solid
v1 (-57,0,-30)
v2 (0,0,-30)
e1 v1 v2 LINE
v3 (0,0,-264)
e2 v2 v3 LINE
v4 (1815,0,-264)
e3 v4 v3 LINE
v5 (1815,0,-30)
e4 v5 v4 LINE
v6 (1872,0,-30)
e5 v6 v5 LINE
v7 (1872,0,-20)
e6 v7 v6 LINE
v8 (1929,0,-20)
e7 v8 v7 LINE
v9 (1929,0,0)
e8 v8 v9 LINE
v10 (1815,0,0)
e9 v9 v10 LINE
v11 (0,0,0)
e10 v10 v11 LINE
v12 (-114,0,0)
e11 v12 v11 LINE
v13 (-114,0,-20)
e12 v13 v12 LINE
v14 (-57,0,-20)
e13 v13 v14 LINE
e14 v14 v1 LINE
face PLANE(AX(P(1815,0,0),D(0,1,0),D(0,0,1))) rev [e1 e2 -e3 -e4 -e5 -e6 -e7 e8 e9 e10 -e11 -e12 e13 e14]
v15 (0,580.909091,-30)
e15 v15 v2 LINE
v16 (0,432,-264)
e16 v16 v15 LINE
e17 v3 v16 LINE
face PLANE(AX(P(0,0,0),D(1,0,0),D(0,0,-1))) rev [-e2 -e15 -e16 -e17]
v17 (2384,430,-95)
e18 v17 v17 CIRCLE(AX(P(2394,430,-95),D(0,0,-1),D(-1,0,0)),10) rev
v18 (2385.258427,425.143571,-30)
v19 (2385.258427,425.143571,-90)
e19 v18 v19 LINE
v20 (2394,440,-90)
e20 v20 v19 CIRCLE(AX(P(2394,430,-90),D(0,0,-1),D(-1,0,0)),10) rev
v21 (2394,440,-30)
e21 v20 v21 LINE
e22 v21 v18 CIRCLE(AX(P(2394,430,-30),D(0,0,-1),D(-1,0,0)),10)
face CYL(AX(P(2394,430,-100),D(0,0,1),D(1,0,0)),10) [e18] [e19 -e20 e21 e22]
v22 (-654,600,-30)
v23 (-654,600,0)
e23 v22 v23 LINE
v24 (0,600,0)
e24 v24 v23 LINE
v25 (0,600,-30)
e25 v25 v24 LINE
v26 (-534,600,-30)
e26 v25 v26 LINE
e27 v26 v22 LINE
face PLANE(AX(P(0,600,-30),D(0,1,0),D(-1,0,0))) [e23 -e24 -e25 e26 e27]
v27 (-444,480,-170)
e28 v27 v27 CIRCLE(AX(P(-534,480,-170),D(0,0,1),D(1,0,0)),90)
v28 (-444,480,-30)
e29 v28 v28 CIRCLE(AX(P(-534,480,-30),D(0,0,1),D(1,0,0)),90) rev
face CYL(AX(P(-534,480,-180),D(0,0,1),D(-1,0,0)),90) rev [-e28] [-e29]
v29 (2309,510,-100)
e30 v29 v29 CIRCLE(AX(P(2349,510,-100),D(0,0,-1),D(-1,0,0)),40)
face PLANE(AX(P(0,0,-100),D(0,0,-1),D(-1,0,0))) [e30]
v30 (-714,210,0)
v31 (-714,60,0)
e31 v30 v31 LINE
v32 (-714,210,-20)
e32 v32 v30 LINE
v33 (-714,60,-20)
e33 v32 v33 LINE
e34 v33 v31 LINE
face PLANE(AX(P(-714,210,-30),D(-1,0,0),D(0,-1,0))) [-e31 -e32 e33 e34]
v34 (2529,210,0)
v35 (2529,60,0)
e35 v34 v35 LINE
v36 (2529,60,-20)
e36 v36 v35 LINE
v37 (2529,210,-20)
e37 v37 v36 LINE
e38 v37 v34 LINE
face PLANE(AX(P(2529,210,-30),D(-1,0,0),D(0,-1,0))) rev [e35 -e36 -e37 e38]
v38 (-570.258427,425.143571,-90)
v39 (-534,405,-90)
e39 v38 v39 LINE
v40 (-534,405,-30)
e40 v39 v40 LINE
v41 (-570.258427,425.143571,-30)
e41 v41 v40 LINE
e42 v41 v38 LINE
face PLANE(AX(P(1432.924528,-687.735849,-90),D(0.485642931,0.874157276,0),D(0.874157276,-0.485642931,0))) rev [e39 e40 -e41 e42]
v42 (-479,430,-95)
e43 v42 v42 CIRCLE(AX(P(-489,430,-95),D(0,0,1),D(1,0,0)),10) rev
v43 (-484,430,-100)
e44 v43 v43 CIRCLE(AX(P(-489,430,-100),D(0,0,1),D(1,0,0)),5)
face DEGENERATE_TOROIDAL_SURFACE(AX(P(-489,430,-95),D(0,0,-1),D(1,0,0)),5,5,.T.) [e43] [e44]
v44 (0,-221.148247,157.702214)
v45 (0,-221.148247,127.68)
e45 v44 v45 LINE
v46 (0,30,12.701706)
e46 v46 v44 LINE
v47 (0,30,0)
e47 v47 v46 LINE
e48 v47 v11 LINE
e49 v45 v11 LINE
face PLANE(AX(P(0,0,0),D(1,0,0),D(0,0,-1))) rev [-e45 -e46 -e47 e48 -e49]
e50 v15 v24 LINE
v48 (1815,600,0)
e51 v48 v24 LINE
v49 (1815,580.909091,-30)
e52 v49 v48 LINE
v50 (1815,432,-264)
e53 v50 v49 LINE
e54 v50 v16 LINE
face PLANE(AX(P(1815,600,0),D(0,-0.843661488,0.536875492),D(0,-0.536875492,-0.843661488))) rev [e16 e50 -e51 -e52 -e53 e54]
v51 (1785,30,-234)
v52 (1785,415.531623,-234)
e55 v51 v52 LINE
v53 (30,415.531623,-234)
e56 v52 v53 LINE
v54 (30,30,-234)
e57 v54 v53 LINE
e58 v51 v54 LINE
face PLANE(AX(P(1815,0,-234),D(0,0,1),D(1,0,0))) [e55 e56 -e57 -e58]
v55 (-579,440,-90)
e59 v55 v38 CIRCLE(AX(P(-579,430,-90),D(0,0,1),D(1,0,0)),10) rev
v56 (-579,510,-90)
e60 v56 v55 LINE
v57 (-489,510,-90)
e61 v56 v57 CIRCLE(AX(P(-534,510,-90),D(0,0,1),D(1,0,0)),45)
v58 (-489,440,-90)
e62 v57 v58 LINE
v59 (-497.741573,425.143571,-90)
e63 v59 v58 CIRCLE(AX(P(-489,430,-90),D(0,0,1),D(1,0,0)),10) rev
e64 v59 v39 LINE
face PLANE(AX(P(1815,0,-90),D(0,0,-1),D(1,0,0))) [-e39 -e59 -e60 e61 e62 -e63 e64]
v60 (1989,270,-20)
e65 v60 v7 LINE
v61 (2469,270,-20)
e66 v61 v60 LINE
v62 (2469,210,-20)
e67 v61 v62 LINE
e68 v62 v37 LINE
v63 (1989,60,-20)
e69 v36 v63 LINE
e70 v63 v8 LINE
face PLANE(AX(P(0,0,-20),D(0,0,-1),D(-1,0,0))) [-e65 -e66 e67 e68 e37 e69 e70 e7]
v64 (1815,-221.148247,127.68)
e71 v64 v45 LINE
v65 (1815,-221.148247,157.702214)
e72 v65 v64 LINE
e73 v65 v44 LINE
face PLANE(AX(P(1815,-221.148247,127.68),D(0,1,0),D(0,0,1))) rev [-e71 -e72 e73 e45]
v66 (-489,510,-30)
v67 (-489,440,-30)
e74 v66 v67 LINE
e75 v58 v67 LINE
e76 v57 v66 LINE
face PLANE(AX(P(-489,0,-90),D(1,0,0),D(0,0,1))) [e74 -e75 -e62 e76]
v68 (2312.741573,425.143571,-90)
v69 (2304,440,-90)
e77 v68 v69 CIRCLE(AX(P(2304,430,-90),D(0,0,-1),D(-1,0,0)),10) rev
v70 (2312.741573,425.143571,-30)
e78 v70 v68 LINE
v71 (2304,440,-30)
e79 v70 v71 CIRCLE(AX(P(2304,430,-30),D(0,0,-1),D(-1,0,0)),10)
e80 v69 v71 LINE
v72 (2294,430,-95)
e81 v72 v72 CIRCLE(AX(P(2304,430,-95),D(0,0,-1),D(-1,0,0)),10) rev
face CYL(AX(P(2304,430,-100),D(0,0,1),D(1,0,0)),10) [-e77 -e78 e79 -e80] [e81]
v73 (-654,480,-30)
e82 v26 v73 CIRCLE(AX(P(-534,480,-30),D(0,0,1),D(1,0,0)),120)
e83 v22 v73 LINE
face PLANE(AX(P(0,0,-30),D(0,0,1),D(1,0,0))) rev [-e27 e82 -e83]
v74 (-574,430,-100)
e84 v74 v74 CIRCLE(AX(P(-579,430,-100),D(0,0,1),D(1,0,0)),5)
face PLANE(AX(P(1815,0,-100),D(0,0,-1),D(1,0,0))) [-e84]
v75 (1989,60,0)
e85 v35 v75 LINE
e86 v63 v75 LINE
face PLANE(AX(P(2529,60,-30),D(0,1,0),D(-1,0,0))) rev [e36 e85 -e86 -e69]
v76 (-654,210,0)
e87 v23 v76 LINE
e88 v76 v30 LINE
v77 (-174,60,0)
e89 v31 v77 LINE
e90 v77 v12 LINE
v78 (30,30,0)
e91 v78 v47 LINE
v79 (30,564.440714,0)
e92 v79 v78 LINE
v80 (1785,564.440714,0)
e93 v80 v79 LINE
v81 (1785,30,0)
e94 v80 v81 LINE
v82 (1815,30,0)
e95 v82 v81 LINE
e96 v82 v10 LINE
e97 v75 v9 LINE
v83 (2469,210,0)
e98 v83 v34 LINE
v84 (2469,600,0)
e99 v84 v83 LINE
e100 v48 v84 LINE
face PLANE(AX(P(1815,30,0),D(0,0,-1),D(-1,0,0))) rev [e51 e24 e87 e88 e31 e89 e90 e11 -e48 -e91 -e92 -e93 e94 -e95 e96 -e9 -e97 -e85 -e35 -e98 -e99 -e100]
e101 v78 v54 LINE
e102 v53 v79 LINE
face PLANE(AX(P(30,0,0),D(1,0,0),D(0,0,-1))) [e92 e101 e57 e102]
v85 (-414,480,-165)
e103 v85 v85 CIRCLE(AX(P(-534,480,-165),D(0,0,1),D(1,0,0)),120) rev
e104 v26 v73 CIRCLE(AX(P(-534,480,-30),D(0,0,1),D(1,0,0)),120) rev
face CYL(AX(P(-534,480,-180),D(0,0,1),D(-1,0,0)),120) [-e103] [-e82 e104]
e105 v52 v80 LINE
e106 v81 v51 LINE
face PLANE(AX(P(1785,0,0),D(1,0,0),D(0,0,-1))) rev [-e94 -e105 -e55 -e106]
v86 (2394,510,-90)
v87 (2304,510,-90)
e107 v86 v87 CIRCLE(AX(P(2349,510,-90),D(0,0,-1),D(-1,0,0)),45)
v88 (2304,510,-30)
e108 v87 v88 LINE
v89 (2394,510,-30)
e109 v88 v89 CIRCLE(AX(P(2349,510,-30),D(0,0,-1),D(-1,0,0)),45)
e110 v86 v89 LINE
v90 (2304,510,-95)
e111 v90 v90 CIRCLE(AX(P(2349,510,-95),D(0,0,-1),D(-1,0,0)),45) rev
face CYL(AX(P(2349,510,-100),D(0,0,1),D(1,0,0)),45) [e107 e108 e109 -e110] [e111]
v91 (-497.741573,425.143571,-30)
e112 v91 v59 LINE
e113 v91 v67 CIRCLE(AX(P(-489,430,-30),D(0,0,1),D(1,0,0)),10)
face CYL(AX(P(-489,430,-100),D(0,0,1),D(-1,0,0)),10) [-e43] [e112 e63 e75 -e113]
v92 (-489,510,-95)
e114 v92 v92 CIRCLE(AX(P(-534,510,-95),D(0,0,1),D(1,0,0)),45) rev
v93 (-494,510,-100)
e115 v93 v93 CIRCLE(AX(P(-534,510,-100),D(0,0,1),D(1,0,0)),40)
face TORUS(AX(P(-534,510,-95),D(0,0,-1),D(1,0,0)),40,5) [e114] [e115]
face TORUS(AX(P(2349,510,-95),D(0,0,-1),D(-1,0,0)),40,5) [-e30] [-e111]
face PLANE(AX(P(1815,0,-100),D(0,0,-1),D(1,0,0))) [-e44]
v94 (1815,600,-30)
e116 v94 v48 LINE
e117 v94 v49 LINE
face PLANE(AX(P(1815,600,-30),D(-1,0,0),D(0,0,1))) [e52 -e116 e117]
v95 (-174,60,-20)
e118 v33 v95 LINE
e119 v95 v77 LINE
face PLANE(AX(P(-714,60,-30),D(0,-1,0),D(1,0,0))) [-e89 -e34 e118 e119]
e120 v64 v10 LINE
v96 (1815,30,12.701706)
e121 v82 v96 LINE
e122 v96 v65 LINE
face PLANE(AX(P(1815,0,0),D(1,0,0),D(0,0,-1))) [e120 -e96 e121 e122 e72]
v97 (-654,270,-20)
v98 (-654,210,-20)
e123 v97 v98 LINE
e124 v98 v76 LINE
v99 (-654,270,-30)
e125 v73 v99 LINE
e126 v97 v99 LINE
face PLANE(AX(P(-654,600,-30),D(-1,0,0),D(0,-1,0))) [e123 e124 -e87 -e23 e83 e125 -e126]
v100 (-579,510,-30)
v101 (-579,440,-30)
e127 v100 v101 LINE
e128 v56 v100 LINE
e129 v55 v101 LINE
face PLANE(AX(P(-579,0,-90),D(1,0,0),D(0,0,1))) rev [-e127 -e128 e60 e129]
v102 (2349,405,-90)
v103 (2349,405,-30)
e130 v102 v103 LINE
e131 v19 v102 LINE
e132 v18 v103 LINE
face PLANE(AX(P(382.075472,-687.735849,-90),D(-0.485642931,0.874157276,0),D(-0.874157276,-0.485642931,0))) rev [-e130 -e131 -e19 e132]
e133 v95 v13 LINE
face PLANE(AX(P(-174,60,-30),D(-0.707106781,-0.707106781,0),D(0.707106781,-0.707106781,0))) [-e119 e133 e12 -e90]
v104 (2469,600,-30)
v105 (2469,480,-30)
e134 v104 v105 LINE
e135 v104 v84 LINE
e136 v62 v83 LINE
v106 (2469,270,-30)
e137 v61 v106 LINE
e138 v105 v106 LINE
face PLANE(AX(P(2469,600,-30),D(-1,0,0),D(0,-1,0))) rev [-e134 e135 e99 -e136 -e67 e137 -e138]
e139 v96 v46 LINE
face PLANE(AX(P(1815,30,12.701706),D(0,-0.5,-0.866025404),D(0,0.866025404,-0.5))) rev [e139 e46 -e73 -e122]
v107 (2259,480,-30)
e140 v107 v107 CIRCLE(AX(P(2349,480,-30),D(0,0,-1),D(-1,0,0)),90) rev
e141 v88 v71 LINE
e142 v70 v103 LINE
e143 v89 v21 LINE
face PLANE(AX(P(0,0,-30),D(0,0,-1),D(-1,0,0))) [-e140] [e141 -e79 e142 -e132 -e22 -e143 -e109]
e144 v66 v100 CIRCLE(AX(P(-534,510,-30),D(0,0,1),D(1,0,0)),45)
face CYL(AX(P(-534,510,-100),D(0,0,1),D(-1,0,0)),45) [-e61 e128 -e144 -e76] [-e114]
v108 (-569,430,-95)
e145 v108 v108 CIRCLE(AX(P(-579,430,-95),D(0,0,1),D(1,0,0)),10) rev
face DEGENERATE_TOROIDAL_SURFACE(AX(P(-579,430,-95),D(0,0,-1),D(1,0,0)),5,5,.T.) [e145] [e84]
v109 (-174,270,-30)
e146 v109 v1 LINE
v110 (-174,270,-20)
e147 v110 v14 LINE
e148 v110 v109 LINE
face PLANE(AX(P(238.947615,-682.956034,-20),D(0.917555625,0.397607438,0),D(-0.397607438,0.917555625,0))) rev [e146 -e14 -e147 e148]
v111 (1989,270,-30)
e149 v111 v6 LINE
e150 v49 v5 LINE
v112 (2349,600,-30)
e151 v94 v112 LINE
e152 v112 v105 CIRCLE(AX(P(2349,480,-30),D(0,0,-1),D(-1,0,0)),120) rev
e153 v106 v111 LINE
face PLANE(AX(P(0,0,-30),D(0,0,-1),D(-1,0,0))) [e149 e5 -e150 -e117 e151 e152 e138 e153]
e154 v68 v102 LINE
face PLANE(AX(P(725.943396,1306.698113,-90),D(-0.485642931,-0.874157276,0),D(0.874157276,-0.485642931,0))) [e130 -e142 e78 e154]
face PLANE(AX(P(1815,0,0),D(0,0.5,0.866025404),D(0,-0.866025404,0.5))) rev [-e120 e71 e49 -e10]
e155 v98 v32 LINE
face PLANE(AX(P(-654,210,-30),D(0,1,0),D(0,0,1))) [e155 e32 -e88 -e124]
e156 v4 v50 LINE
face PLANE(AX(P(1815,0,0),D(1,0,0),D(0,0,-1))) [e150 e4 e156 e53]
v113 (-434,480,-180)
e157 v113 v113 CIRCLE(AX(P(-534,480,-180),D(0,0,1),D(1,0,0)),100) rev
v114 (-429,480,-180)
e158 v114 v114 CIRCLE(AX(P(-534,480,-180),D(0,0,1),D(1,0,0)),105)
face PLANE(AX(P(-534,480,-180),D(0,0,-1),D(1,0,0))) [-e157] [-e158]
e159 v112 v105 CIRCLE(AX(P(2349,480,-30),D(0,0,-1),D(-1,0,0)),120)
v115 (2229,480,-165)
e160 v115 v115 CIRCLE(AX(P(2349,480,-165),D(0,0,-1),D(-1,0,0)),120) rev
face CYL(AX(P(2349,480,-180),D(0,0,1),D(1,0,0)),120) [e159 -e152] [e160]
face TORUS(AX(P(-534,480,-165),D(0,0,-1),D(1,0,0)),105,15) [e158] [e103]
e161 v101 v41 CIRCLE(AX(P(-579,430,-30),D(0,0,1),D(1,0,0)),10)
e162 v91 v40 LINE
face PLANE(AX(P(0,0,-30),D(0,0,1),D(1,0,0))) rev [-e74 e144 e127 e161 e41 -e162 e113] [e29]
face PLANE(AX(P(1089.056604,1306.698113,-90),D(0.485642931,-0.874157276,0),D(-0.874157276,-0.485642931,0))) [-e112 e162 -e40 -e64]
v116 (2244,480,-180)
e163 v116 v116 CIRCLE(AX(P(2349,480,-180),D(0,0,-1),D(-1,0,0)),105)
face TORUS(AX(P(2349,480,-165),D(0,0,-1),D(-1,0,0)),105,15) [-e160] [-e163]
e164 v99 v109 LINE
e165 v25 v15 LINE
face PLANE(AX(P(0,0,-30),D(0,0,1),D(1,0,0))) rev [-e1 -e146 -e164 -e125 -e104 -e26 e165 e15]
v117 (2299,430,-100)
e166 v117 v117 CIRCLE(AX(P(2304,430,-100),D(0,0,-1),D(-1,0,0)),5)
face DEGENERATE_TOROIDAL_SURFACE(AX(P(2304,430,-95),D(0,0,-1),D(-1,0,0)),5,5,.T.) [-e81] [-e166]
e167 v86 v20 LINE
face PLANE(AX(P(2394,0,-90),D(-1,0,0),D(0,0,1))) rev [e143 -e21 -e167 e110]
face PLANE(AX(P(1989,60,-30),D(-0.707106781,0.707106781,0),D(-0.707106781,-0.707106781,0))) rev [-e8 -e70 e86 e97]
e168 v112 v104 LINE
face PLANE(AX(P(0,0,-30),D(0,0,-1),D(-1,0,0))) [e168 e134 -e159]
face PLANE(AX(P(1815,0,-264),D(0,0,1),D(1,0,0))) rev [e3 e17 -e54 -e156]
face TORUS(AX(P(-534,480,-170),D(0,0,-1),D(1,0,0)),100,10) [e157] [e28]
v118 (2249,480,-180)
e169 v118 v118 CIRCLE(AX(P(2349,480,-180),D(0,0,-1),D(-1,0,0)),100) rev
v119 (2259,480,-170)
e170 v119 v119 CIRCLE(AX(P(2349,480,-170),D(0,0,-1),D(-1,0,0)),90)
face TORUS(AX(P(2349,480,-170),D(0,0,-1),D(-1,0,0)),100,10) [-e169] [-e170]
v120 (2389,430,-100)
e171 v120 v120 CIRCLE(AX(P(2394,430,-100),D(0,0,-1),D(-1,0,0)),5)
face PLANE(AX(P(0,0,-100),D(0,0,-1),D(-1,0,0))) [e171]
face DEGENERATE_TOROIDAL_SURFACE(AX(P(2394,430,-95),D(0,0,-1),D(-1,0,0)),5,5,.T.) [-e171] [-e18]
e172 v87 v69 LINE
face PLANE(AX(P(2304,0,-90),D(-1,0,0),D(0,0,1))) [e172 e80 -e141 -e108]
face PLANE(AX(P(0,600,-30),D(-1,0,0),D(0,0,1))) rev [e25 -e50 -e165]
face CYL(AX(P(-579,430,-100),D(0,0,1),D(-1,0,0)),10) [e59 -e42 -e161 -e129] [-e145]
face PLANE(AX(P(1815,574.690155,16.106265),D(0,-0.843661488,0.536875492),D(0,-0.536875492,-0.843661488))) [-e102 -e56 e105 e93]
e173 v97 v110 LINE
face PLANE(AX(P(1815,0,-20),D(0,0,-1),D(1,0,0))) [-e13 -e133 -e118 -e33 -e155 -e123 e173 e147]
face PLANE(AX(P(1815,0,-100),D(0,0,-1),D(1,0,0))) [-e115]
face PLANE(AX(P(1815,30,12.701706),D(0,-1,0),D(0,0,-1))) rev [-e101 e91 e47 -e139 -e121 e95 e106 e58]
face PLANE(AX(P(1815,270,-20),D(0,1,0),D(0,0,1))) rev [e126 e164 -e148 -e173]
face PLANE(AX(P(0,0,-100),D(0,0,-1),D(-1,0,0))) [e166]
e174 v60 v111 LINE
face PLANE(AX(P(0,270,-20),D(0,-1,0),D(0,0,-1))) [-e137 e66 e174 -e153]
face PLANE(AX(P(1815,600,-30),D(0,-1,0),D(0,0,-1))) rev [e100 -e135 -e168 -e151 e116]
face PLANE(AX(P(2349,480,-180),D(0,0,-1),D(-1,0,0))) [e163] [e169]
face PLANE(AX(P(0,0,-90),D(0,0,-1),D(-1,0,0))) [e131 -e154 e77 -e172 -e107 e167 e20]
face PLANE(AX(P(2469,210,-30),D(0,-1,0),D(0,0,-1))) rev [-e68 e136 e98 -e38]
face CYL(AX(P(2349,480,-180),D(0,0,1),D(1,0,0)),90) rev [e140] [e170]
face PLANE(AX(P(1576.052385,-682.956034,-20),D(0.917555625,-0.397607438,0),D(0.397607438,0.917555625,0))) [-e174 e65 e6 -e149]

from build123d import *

# Parameters (mm, degrees)
Y_KSEKLIK_EKSTR_ZYON1_DEPTH = 1815
BO_ALTMA1_START             = 30
BO_ALTMA1_DEPTH             = 1755
Y_KSEKLIK_EKSTR_ZYON2_DEPTH = 30
IZIM3_R                     = 120
IZIM3_R_2                   = 90
Y_KSEKLIK_EKSTR_ZYON3_DEPTH = 150
IZIM4_R                     = 45
Y_KSEKLIK_EKSTR_ZYON4_DEPTH = 70
Y_KSEKLIK_EKSTR_ZYON5_DEPTH = 60
Y_KSEKLIK_EKSTR_ZYON6_DEPTH = 70
RADYUS1_R                   = 15
RADYUS2_R                   = 10
RADYUS3_R                   = 5
KES_EKSTR_ZYON1_DEPTH       = 10


# Read off the part's stored shape, not the designer's step: İç Boşaltma1
with BuildPart() as part:
    # Çizim1 → Yükseklik-Ekstrüzyon1 (new body)
    with BuildSketch(Plane(origin=(0, 0, 0), x_dir=(0, 0, -1), z_dir=(1, 0, 0))):
        Polygon((0, 0), (264, 0), (264, 432), (0, 600), (0, 30), (-12.701705922, 30), (-157.702213998, -221.14824711), (-127.68, -221.14824711), align=None)
    extrude(amount=Y_KSEKLIK_EKSTR_ZYON1_DEPTH)

    # İç Boşaltma1 outline → İç Boşaltma1 (cut)
    with BuildSketch(Plane.YZ.offset(BO_ALTMA1_START)):
        Polygon((564.440714153, 0), (30, 0), (30, -234), (415.531623244, -234), align=None)
    extrude(amount=BO_ALTMA1_DEPTH, mode=Mode.SUBTRACT)

    # Çizim2 → Yükseklik-Ekstrüzyon2 (add)
    with BuildSketch(Plane.XY):
        Polygon((1815, 600), (2469, 600), (2469, 210), (2529, 210), (2529, 60), (1989, 60), (1929, 0), (1815, 0), align=None)
        Polygon((0, 600), (0, 0), (-114, 0), (-174, 60), (-714, 60), (-714, 210), (-654, 210), (-654, 600), align=None)
    extrude(amount=-Y_KSEKLIK_EKSTR_ZYON2_DEPTH)



with BuildPart() as body_2:
    # Çizim3 → Yükseklik-Ekstrüzyon3 (new body)
    with BuildSketch(Plane(origin=(0, 0, -30), x_dir=(-1, 0, 0), z_dir=(0, 0, -1))):
        with Locations((-2349, 480)):
            Circle(IZIM3_R)
        with Locations((-2349, 480)):
            Circle(IZIM3_R_2, mode=Mode.SUBTRACT)
    extrude(amount=Y_KSEKLIK_EKSTR_ZYON3_DEPTH)


with BuildPart() as part_1:
    add(part.part)

    add(body_2.part)  # Yükseklik-Ekstrüzyon4 merges body 2
    # Çizim4 → Yükseklik-Ekstrüzyon4 (add)
    with BuildSketch(Plane(origin=(0, 0, -30), x_dir=(-1, 0, 0), z_dir=(0, 0, -1))):
        with Locations((-2349, 510)):
            Circle(IZIM4_R)
    extrude(amount=Y_KSEKLIK_EKSTR_ZYON4_DEPTH)

    # Çizim4<3> → Yükseklik-Ekstrüzyon5 (add)
    with BuildSketch(Plane(origin=(0, 0, -30), x_dir=(-1, 0, 0), z_dir=(0, 0, -1))):
        with BuildLine():
            Line((-2304, 430), (-2304, 510))
            ThreePointArc((-2304, 510), (-2349, 465), (-2394, 510))
            Line((-2394, 510), (-2394, 430))
            Line((-2394, 430), (-2349, 405))
            Line((-2349, 405), (-2304, 430))
        make_face()
    extrude(amount=Y_KSEKLIK_EKSTR_ZYON5_DEPTH)

    # Çizim5 → Yükseklik-Ekstrüzyon6 (add)
    with BuildSketch(Plane(origin=(0, 0, -30), x_dir=(-1, 0, 0), z_dir=(0, 0, -1))):
        with BuildLine():
            ThreePointArc((-2394, 440), (-2402.6187091, 424.928722701), (-2385.258427239, 425.143570688))
            Line((-2385.258427239, 425.143570688), (-2394, 430))
            Line((-2394, 430), (-2394, 440))
        make_face()
        with BuildLine():
            Line((-2394, 430), (-2385.258427239, 425.143570688))
            ThreePointArc((-2385.258427239, 425.143570688), (-2384.319717783, 427.491586917), (-2384, 430))
            ThreePointArc((-2384, 430), (-2386.928932188, 437.071067812), (-2394, 440))
            Line((-2394, 440), (-2394, 430))
        make_face()
        with BuildLine():
            ThreePointArc((-2312.741572761, 425.143570688), (-2301.491586917, 420.319717783), (-2294, 430))
            ThreePointArc((-2294, 430), (-2296.928932188, 437.071067812), (-2304, 440))
            Line((-2304, 440), (-2304, 430))
            Line((-2304, 430), (-2312.741572761, 425.143570688))
        make_face()
        with BuildLine():
            Line((-2304, 430), (-2304, 440))
            ThreePointArc((-2304, 440), (-2312.6187091, 435.071277299), (-2312.741572761, 425.143570688))
            Line((-2312.741572761, 425.143570688), (-2304, 430))
        make_face()
    extrude(amount=Y_KSEKLIK_EKSTR_ZYON6_DEPTH)

    # Radyus1
    radyus1_edges = [part_1.edges().sort_by_distance(p)[0] for p in [
        (2469, 480, -180),
    ]]
    fillet(radyus1_edges, radius=RADYUS1_R)

    # Radyus2
    radyus2_edges = [part_1.edges().sort_by_distance(p)[0] for p in [
        (2439, 480, -180),
    ]]
    fillet(radyus2_edges, radius=RADYUS2_R)

    # Radyus3
    radyus3_edges = [part_1.edges().sort_by_distance(p)[0] for p in [
        (2402.741572761, 434.856429312, -100),
        (2304, 420, -100),
        (2394, 510, -100),
    ]]
    fillet(radyus3_edges, radius=RADYUS3_R)

    # Aynalama17: part across plane


with BuildPart() as part_2:
    add(part_1.part)
    add(part_1.part.mirror(Plane.ZY.offset(-907.5)))

    # Çizim6 → Kes-Ekstrüzyon1 (cut)
    with BuildSketch(Plane(origin=(0, 0, -30), x_dir=(-1, 0, 0), z_dir=(0, 0, -1))):
        Polygon((-1989, 270), (-2469, 270), (-2469, 210), (-2529, 210), (-2529, 60), (-1989, 60), (-1929, 0), (-1872, 0), align=None)
    kes_ekstr_zyon1 = extrude(amount=-KES_EKSTR_ZYON1_DEPTH, mode=Mode.SUBTRACT)

    # Aynalama18: Kes-Ekstrüzyon1 across plane
    add(kes_ekstr_zyon1.mirror(Plane.ZY.offset(-907.5)), mode=Mode.SUBTRACT)


solid = part_2.part
